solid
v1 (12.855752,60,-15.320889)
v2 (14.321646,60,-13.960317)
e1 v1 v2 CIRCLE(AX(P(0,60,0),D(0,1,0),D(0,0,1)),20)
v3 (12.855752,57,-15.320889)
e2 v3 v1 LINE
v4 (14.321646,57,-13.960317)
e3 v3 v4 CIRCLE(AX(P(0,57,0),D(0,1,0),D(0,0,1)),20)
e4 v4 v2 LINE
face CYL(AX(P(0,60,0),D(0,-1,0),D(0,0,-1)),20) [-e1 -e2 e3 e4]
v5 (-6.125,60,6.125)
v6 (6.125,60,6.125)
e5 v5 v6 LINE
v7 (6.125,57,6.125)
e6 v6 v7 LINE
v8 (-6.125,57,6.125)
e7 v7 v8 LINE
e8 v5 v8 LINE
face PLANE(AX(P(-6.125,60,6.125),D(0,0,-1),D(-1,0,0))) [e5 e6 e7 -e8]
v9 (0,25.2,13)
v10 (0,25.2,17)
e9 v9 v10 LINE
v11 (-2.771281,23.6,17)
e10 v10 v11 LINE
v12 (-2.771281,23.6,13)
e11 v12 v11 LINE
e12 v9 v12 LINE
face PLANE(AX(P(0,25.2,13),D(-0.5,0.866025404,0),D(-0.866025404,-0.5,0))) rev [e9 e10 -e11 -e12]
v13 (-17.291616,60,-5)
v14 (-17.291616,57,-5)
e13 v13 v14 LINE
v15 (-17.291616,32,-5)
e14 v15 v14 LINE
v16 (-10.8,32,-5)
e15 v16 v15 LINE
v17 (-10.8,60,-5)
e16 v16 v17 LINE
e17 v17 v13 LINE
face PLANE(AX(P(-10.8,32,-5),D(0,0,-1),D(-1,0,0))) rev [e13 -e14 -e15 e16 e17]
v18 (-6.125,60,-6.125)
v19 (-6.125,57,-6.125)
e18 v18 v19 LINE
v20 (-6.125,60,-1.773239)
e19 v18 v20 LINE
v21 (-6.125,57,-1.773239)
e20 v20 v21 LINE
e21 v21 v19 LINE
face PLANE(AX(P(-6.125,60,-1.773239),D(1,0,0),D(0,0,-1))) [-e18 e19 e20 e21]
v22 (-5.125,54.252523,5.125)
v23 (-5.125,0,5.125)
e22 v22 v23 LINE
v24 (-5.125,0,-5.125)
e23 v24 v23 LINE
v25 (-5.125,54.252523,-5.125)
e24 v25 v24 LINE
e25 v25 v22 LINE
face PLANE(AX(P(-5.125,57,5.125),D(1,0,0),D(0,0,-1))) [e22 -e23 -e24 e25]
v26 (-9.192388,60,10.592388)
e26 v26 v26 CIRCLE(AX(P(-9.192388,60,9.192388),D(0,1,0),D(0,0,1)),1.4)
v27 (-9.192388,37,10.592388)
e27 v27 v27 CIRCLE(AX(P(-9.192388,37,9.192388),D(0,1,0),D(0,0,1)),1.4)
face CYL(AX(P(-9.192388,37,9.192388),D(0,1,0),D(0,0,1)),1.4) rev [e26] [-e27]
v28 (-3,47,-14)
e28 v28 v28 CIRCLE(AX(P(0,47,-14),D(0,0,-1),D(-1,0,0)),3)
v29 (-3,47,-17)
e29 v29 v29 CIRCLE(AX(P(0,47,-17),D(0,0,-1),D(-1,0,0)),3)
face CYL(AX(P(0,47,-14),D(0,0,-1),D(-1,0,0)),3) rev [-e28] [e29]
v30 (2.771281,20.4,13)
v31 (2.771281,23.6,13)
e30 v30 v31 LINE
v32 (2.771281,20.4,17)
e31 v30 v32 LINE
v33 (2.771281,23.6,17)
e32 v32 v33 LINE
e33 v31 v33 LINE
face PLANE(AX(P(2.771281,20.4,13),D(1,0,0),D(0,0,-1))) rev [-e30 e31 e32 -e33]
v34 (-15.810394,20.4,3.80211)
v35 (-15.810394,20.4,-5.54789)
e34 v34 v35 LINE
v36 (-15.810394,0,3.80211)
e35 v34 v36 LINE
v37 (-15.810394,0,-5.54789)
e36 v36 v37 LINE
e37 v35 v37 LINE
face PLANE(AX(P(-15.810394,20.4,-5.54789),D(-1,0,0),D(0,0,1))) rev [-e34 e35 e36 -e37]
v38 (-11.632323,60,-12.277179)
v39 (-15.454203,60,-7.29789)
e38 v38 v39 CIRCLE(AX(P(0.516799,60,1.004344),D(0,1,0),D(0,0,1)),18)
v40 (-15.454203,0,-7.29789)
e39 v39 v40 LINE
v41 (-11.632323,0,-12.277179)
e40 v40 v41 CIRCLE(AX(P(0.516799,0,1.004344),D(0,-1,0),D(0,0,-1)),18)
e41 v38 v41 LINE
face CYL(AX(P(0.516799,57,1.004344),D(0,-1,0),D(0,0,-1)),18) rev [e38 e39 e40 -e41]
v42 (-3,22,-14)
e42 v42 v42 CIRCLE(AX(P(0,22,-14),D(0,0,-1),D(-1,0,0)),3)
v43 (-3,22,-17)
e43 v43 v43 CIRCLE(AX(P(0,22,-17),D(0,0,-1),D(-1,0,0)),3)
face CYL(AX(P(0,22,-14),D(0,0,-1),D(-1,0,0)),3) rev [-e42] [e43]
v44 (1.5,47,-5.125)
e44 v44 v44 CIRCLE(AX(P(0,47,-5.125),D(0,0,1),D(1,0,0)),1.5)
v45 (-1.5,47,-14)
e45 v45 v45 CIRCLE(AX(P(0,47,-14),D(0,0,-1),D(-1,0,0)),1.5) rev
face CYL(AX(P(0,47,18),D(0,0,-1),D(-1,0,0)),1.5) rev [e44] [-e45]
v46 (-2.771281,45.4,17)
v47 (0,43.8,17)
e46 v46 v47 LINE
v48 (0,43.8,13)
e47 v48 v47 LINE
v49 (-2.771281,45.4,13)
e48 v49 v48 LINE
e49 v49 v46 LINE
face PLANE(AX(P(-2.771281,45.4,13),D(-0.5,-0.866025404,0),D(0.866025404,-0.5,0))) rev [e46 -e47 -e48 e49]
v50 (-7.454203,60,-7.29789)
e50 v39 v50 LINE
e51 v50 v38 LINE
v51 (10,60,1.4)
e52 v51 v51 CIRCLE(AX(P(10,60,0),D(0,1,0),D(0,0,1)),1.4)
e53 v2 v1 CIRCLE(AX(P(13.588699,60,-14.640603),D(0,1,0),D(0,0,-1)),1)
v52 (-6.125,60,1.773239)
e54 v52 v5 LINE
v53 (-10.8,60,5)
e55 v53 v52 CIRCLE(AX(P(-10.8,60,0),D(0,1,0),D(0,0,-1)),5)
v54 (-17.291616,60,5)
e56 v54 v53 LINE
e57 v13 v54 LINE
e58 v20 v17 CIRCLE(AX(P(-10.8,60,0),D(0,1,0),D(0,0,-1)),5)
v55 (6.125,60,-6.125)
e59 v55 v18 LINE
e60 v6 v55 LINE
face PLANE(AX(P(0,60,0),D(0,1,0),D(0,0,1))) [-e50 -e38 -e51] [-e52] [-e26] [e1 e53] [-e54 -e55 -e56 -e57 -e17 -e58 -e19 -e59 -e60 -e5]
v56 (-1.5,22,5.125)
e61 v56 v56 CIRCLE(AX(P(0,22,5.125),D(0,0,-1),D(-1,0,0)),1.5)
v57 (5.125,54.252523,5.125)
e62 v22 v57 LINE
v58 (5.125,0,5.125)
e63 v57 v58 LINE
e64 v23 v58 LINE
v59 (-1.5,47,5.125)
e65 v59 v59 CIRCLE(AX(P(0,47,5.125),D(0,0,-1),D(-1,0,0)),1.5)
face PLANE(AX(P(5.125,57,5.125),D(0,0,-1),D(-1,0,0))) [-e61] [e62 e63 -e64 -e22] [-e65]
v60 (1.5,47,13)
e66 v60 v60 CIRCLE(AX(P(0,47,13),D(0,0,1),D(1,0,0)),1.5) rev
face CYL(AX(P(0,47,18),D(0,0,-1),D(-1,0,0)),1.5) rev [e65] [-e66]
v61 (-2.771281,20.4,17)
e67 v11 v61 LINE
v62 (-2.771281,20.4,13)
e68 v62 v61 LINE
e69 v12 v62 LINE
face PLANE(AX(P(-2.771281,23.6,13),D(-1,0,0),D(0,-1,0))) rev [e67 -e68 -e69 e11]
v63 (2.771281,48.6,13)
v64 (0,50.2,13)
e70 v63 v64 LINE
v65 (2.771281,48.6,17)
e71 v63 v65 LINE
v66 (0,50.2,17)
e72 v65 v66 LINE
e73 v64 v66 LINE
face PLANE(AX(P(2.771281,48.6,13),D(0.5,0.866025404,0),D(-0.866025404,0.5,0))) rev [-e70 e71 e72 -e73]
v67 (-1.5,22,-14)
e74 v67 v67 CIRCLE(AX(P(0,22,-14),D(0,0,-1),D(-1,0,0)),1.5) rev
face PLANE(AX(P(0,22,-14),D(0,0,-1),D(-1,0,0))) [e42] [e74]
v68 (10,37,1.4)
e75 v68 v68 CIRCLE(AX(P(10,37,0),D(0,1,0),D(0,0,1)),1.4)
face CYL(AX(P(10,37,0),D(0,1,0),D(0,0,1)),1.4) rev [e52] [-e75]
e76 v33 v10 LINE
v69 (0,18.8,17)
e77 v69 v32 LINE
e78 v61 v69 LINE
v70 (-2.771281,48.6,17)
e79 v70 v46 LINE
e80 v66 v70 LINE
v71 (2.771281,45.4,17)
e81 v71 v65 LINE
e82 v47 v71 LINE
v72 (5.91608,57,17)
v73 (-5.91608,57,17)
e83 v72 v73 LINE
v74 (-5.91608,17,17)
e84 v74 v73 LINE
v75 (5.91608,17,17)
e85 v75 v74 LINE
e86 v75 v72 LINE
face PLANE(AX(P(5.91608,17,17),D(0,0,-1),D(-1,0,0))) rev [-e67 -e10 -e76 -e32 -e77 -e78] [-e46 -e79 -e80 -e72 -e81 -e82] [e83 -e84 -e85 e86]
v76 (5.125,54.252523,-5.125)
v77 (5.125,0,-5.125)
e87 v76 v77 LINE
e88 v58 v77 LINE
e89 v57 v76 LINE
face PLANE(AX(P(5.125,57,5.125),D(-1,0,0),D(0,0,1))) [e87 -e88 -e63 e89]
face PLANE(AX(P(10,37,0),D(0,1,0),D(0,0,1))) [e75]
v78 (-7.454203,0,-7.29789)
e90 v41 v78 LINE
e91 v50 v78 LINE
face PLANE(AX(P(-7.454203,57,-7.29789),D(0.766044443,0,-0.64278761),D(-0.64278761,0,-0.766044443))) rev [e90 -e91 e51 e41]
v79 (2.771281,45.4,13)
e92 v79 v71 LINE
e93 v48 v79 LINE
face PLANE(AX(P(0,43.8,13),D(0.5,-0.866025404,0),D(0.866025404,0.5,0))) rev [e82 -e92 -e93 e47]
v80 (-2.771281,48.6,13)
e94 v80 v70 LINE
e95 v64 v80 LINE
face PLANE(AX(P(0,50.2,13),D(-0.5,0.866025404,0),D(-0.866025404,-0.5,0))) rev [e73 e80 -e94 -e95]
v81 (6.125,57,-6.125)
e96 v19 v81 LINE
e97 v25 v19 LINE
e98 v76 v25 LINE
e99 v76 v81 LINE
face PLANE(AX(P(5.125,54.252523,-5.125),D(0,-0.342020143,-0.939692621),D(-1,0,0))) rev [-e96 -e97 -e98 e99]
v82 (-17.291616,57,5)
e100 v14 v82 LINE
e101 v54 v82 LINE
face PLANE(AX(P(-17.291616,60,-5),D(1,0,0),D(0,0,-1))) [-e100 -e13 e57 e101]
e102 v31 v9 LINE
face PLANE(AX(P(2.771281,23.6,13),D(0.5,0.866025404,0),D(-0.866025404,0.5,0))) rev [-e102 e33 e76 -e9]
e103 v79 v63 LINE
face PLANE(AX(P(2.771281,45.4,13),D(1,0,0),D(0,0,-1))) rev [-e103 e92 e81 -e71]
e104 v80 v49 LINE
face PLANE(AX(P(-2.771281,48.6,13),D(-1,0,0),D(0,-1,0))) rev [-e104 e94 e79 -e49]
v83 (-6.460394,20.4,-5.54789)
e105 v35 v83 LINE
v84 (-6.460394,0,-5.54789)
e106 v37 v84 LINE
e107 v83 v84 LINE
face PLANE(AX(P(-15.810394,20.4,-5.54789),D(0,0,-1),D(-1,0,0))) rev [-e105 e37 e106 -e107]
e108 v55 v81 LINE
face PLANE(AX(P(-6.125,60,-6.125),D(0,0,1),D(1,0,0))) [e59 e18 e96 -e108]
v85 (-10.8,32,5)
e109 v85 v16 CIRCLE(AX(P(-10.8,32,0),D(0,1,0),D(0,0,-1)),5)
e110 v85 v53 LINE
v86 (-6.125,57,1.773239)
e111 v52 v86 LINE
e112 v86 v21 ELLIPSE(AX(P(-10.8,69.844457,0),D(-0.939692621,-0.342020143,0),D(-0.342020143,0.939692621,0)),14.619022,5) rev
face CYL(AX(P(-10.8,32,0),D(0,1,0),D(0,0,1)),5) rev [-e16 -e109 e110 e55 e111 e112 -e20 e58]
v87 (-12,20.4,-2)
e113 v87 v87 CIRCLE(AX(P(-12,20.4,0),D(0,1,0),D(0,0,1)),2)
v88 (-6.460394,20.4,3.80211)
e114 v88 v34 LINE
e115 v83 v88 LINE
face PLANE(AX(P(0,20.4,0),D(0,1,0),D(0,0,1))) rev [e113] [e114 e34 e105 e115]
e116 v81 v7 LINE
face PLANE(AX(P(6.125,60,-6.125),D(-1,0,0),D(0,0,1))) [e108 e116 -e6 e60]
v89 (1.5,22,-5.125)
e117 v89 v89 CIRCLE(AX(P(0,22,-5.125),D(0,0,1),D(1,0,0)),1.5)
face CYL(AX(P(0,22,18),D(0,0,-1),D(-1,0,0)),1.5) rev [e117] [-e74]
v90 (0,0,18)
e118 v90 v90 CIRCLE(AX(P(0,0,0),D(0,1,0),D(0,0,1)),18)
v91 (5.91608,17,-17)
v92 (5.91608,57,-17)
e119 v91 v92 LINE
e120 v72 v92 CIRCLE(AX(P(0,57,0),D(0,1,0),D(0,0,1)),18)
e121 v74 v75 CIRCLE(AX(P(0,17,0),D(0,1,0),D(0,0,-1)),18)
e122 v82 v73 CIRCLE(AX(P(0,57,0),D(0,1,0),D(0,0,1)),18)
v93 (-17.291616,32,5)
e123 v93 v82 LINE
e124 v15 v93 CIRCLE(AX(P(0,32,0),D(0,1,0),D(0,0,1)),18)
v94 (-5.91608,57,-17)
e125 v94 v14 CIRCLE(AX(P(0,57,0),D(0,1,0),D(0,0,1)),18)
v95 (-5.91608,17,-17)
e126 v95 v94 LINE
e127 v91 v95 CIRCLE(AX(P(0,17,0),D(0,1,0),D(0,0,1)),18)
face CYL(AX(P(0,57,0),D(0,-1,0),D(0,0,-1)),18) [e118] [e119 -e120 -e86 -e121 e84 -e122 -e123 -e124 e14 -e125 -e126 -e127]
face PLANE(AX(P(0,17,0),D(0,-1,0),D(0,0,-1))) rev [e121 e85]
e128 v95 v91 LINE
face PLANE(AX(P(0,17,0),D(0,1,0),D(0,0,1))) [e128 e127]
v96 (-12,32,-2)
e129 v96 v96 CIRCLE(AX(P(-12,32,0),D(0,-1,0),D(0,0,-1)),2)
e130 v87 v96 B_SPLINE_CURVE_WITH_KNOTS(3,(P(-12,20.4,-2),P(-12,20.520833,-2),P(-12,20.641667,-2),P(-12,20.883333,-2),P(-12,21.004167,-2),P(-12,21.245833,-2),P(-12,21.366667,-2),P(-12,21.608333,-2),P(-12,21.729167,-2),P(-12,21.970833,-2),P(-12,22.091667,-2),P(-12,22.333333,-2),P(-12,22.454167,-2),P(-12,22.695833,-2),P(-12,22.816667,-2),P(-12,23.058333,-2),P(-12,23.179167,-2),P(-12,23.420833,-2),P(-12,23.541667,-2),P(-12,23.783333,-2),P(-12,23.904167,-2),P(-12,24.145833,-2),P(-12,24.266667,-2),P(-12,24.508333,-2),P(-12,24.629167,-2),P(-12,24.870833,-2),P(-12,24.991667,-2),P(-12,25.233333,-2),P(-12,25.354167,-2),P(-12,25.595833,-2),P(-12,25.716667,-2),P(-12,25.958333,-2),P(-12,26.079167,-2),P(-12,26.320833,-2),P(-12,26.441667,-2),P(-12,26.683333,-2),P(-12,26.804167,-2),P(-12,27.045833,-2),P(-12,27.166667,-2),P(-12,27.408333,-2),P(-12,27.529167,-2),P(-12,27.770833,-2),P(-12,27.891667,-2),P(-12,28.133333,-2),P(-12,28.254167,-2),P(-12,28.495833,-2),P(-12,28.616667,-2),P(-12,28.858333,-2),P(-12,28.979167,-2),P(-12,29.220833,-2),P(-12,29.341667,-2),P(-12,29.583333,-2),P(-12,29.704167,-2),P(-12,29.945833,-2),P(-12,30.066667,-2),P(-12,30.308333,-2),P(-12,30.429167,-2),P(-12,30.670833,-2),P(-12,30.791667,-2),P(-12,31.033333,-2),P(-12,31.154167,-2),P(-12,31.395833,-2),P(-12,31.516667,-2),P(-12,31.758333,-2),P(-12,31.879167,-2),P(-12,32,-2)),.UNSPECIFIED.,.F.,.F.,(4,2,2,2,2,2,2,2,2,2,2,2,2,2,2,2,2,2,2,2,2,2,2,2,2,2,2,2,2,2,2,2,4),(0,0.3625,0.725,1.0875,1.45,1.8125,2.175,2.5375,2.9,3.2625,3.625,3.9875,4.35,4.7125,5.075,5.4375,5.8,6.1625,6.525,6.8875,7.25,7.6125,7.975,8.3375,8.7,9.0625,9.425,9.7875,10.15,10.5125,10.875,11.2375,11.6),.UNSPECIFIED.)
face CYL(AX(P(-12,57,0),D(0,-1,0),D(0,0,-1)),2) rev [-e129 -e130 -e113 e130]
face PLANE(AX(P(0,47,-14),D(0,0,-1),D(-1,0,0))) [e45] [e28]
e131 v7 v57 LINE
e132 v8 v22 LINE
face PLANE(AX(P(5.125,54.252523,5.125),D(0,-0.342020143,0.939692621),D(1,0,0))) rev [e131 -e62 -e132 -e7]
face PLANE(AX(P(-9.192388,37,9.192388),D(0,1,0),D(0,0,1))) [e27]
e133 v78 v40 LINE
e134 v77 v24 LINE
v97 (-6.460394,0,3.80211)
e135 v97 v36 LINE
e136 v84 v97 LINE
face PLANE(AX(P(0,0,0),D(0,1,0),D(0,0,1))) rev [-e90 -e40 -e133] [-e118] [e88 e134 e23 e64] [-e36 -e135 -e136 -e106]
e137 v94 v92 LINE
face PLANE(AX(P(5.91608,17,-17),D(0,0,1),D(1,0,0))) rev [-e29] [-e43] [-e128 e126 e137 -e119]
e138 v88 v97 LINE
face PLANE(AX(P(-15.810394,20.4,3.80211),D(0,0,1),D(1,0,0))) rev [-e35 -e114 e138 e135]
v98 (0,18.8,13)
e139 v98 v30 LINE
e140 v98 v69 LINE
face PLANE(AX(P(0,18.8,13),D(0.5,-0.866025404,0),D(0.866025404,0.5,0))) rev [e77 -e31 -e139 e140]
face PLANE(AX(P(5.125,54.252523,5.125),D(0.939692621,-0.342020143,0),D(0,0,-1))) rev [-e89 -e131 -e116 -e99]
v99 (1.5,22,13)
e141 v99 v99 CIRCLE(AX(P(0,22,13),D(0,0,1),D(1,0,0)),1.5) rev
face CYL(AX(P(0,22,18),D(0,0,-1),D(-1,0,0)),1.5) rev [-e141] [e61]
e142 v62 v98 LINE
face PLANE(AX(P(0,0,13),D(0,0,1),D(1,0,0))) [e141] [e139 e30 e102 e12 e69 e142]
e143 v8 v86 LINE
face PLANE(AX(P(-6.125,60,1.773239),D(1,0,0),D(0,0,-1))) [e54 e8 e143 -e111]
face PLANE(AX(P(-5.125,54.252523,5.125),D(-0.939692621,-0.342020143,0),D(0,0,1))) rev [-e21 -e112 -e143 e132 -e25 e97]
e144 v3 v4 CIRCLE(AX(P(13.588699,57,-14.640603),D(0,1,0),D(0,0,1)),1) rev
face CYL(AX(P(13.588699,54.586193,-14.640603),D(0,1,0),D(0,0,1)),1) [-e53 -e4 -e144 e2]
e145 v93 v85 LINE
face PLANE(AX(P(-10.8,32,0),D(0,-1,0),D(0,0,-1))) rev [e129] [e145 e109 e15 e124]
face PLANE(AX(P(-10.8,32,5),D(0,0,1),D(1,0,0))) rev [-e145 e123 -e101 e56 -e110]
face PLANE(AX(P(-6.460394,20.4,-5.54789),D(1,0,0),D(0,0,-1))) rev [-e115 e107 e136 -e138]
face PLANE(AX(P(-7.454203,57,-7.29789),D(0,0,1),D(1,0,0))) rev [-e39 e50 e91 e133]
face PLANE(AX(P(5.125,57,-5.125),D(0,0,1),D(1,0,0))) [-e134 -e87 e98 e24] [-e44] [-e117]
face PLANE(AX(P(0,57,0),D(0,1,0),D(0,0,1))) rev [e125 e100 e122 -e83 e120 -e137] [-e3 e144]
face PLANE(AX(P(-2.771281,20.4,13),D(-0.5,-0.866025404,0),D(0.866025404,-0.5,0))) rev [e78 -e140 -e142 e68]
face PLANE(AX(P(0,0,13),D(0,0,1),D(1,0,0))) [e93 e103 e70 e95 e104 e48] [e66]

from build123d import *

# Parameters (mm, degrees)
SKETCH1_R           = 18
SKETCH1_R_2         = 2
SKETCH1_W           = 10.25
SKETCH1_H           = 10.25
BOSS_EXTRUDE1_DEPTH = 57
CUT_EXTRUDE1_START  = -25
CUT_EXTRUDE1_DEPTH  = 25
SKETCH4_W           = 9.35
SKETCH4_H           = 9.35
CUT_EXTRUDE3_DEPTH  = 20.4
CUT_EXTRUDE4_START  = -40
CUT_EXTRUDE4_DEPTH  = 40
SKETCH6_R           = 1.5
CUT_EXTRUDE5_DEPTH  = 70.267597042
SKETCH7_R           = 3
CUT_EXTRUDE6_DEPTH  = 3
CUT_EXTRUDE7_DEPTH  = 4
CHAMFER1_SIZE       = 1
CHAMFER1_SIZE_2     = 2.747477419
CUT_EXTRUDE8_DEPTH  = 63.42595614
SKETCH12_R          = 1.4
CUT_EXTRUDE10_DEPTH = 20
SKETCH13_R          = 20
SKETCH13_R_2        = 1.4
BOSS_EXTRUDE2_DEPTH = 3
BOSS_EXTRUDE3_DEPTH = 3


with BuildPart() as part:
    # Sketch1 → Boss-Extrude1 (new body)
    with BuildSketch(Plane(origin=(0, 0, 0), x_dir=(1, 0, 0), z_dir=(0, 1, 0))):
        with Locations(Location((0, 0, 0), (0, 0, 90))):
            Circle(SKETCH1_R)
        with Locations(Location((-12, 0, 0), (0, 0, 90))):
            Circle(SKETCH1_R_2, mode=Mode.SUBTRACT)
        Rectangle(SKETCH1_W, SKETCH1_H, mode=Mode.SUBTRACT)
    extrude(amount=BOSS_EXTRUDE1_DEPTH)

    # Sketch2 → Cut-Extrude1 (cut)
    with BuildSketch(Plane(origin=(0, 57, 0), x_dir=(1, 0, 0), z_dir=(0, 1, 0)).offset(CUT_EXTRUDE1_START)):
        with BuildLine():
            Line((-10.8, 5), (-17.291616466, 5))
            ThreePointArc((-17.291616466, 5), (-18, 0), (-17.291616466, -5))
            Line((-17.291616466, -5), (-10.8, -5))
            ThreePointArc((-10.8, -5), (-5.8, 0), (-10.8, 5))
        make_face()
    extrude(amount=CUT_EXTRUDE1_DEPTH, mode=Mode.SUBTRACT)

    # Sketch4 → Cut-Extrude3 (cut)
    with BuildSketch(Plane(origin=(0, 0, 0), x_dir=(-1, 0, 0), z_dir=(0, -1, 0))):
        with Locations((11.135393506, 0.872889968)):
            Rectangle(SKETCH4_W, SKETCH4_H)
    extrude(amount=-CUT_EXTRUDE3_DEPTH, mode=Mode.SUBTRACT)

    # Sketch5 → Cut-Extrude4 (cut)
    with BuildSketch(Plane(origin=(0, 57, 0), x_dir=(1, 0, 0), z_dir=(0, 1, 0)).offset(CUT_EXTRUDE4_START)):
        with BuildLine():
            Line((5.916079783, 17), (-5.916079783, 17))
            ThreePointArc((-5.916079783, 17), (0, 18), (5.916079783, 17))
        make_face()
        with BuildLine():
            Line((5.916079783, -17), (-5.916079783, -17))
            ThreePointArc((-5.916079783, -17), (0, -18), (5.916079783, -17))
        make_face()
    extrude(amount=CUT_EXTRUDE4_DEPTH, mode=Mode.SUBTRACT)

    # Sketch6 → Cut-Extrude5 (cut, through all)
    with BuildSketch(Plane(origin=(0, 0, -17), x_dir=(-1, 0, 0), z_dir=(0, 0, -1))):
        with Locations((0, 47)):
            Circle(SKETCH6_R)
        with Locations((0, 22)):
            Circle(SKETCH6_R)
    extrude(amount=-CUT_EXTRUDE5_DEPTH, mode=Mode.SUBTRACT)

    # Sketch7 → Cut-Extrude6 (cut)
    with BuildSketch(Plane(origin=(0, 0, -17), x_dir=(-1, 0, 0), z_dir=(0, 0, -1))):
        with Locations((0, 47)):
            Circle(SKETCH7_R)
        with Locations((0, 22)):
            Circle(SKETCH7_R)
    extrude(amount=-CUT_EXTRUDE6_DEPTH, mode=Mode.SUBTRACT)

    # Sketch8 → Cut-Extrude7 (cut)
    with BuildSketch(Plane.XY.offset(17)):
        Polygon((0, 43.8), (2.771281292, 45.4), (2.771281292, 48.6), (0, 50.2), (-2.771281292, 48.6), (-2.771281292, 45.4), align=None)
        Polygon((0, 18.8), (2.771281292, 20.4), (2.771281292, 23.6), (0, 25.2), (-2.771281292, 23.6), (-2.771281292, 20.4), align=None)
    extrude(amount=-CUT_EXTRUDE7_DEPTH, mode=Mode.SUBTRACT)

    # Chamfer1
    # the kernel refuses this chamfer: 2.747477419, 1 mm, written as the material it takes off along each edge
    with BuildSketch(Plane(origin=(-5.125, 57, -5.125), x_dir=(0, 0.09904090225204956, -0.9950833631817488), z_dir=(1, 0, 0)), Plane(origin=(-5.125, 57, 5.125), x_dir=(-0.9950833631817488, 0.09904090225204956, 0), z_dir=(0, 0, -1)), Plane(origin=(5.125, 57, 5.125), x_dir=(0, 0.09904090225204956, 0.9950833631817488), z_dir=(-1, 0, 0)), Plane(origin=(5.125, 57, -5.125), x_dir=(0.9950833631817488, 0.09904090225204956, 0), z_dir=(0, 0, 1))) as chamfer1_piece_1:
        Polygon((CHAMFER1_SIZE * 0.995083363182, -CHAMFER1_SIZE * 0.099040902252), (-CHAMFER1_SIZE_2 * 0.0990409022684, -CHAMFER1_SIZE_2 * 0.995083363346), (0, 0), align=None)
    extrude(amount=10.25, mode=Mode.SUBTRACT)
    with BuildSketch(Plane(origin=(-5.125, 57, 5.125), x_dir=(-0.9950833631817488, 0.09904090225204956, 0), z_dir=(0, 0, -1))) as chamfer1_piece_2a_section:
        Polygon((CHAMFER1_SIZE * 0.995083363182, -CHAMFER1_SIZE * 0.099040902252), (-CHAMFER1_SIZE_2 * 0.0990409022684, -CHAMFER1_SIZE_2 * 0.995083363346), (0, 0), align=None)
    chamfer1_piece_2a = extrude(amount=17.377491449, mode=Mode.PRIVATE)
    chamfer1_piece_2a = split(chamfer1_piece_2a, bisect_by=Plane(origin=(-5.432505006, 56.059901151, -5.125), z_dir=(0, 0, -1)), keep=Keep.TOP, mode=Mode.PRIVATE)
    with BuildSketch(Plane(origin=(-12.252491449, 57, -5.125), x_dir=(0, 0.09904090225204956, -0.9950833631817488), z_dir=(1, 0, 0))) as chamfer1_piece_2b_section:
        Polygon((CHAMFER1_SIZE * 0.995083363182, -CHAMFER1_SIZE * 0.099040902252), (-CHAMFER1_SIZE_2 * 0.0990409022684, -CHAMFER1_SIZE_2 * 0.995083363346), (0, 0), align=None)
    chamfer1_piece_2b = extrude(amount=17.377491449, mode=Mode.PRIVATE)
    chamfer1_piece_2b = split(chamfer1_piece_2b, bisect_by=Plane(origin=(-5.125, 56.059901151, -5.432505006), z_dir=(-1, 0, 0)), keep=Keep.TOP, mode=Mode.PRIVATE)
    chamfer1_piece_2 = chamfer1_piece_2a & chamfer1_piece_2b
    add(chamfer1_piece_2, mode=Mode.SUBTRACT)
    with BuildSketch(Plane(origin=(5.125, 57, -12.252491449), x_dir=(0.9950833631817488, 0.09904090225204956, 0), z_dir=(0, 0, 1))) as chamfer1_piece_3a_section:
        Polygon((CHAMFER1_SIZE * 0.995083363182, -CHAMFER1_SIZE * 0.099040902252), (-CHAMFER1_SIZE_2 * 0.0990409022684, -CHAMFER1_SIZE_2 * 0.995083363346), (0, 0), align=None)
    chamfer1_piece_3a = extrude(amount=17.377491449, mode=Mode.PRIVATE)
    chamfer1_piece_3a = split(chamfer1_piece_3a, bisect_by=Plane(origin=(5.432505006, 56.059901151, -5.125), z_dir=(0, 0, -1)), keep=Keep.TOP, mode=Mode.PRIVATE)
    with BuildSketch(Plane(origin=(-5.125, 57, -5.125), x_dir=(0, 0.09904090225204956, -0.9950833631817488), z_dir=(1, 0, 0))) as chamfer1_piece_3b_section:
        Polygon((CHAMFER1_SIZE * 0.995083363182, -CHAMFER1_SIZE * 0.099040902252), (-CHAMFER1_SIZE_2 * 0.0990409022684, -CHAMFER1_SIZE_2 * 0.995083363346), (0, 0), align=None)
    chamfer1_piece_3b = extrude(amount=17.377491449, mode=Mode.PRIVATE)
    chamfer1_piece_3b = split(chamfer1_piece_3b, bisect_by=Plane(origin=(5.125, 56.059901151, -5.432505006), z_dir=(1, 0, 0)), keep=Keep.TOP, mode=Mode.PRIVATE)
    chamfer1_piece_3 = chamfer1_piece_3a & chamfer1_piece_3b
    add(chamfer1_piece_3, mode=Mode.SUBTRACT)
    with BuildSketch(Plane(origin=(5.125, 57, 5.125), x_dir=(0, 0.09904090225204956, 0.9950833631817488), z_dir=(-1, 0, 0))) as chamfer1_piece_4a_section:
        Polygon((CHAMFER1_SIZE * 0.995083363182, -CHAMFER1_SIZE * 0.099040902252), (-CHAMFER1_SIZE_2 * 0.0990409022684, -CHAMFER1_SIZE_2 * 0.995083363346), (0, 0), align=None)
    chamfer1_piece_4a = extrude(amount=17.377491449, mode=Mode.PRIVATE)
    chamfer1_piece_4a = split(chamfer1_piece_4a, bisect_by=Plane(origin=(-5.125, 56.059901151, 5.432505006), z_dir=(-1, 0, 0)), keep=Keep.TOP, mode=Mode.PRIVATE)
    with BuildSketch(Plane(origin=(-5.125, 57, 12.252491449), x_dir=(-0.9950833631817488, 0.09904090225204956, 0), z_dir=(0, 0, -1))) as chamfer1_piece_4b_section:
        Polygon((CHAMFER1_SIZE * 0.995083363182, -CHAMFER1_SIZE * 0.099040902252), (-CHAMFER1_SIZE_2 * 0.0990409022684, -CHAMFER1_SIZE_2 * 0.995083363346), (0, 0), align=None)
    chamfer1_piece_4b = extrude(amount=17.377491449, mode=Mode.PRIVATE)
    chamfer1_piece_4b = split(chamfer1_piece_4b, bisect_by=Plane(origin=(-5.432505006, 56.059901151, 5.125), z_dir=(0, 0, 1)), keep=Keep.TOP, mode=Mode.PRIVATE)
    chamfer1_piece_4 = chamfer1_piece_4a & chamfer1_piece_4b
    add(chamfer1_piece_4, mode=Mode.SUBTRACT)
    with BuildSketch(Plane(origin=(12.252491449, 57, 5.125), x_dir=(0, 0.09904090225204956, 0.9950833631817488), z_dir=(-1, 0, 0))) as chamfer1_piece_5a_section:
        Polygon((CHAMFER1_SIZE * 0.995083363182, -CHAMFER1_SIZE * 0.099040902252), (-CHAMFER1_SIZE_2 * 0.0990409022684, -CHAMFER1_SIZE_2 * 0.995083363346), (0, 0), align=None)
    chamfer1_piece_5a = extrude(amount=17.377491449, mode=Mode.PRIVATE)
    chamfer1_piece_5a = split(chamfer1_piece_5a, bisect_by=Plane(origin=(5.125, 56.059901151, 5.432505006), z_dir=(1, 0, 0)), keep=Keep.TOP, mode=Mode.PRIVATE)
    with BuildSketch(Plane(origin=(5.125, 57, -5.125), x_dir=(0.9950833631817488, 0.09904090225204956, 0), z_dir=(0, 0, 1))) as chamfer1_piece_5b_section:
        Polygon((CHAMFER1_SIZE * 0.995083363182, -CHAMFER1_SIZE * 0.099040902252), (-CHAMFER1_SIZE_2 * 0.0990409022684, -CHAMFER1_SIZE_2 * 0.995083363346), (0, 0), align=None)
    chamfer1_piece_5b = extrude(amount=17.377491449, mode=Mode.PRIVATE)
    chamfer1_piece_5b = split(chamfer1_piece_5b, bisect_by=Plane(origin=(5.432505006, 56.059901151, 5.125), z_dir=(0, 0, 1)), keep=Keep.TOP, mode=Mode.PRIVATE)
    chamfer1_piece_5 = chamfer1_piece_5a & chamfer1_piece_5b
    add(chamfer1_piece_5, mode=Mode.SUBTRACT)

    # Sketch9 → Cut-Extrude8 (cut, through all)
    with BuildSketch(Plane.XZ):
        with BuildLine():
            Line((-7.454203172, -7.297889968), (-15.454203172, -7.297889968))
            ThreePointArc((-15.454203172, -7.297889968), (-13.761984914, -9.955415688), (-11.632322635, -12.277178848))
            Line((-11.632322635, -12.277178848), (-7.454203172, -7.297889968))
        make_face()
    extrude(amount=-CUT_EXTRUDE8_DEPTH, mode=Mode.SUBTRACT)

    # Sketch12 → Cut-Extrude10 (cut)
    with BuildSketch(Plane(origin=(0, 57, 0), x_dir=(1, 0, 0), z_dir=(0, 1, 0))):
        with Locations(Location((10, 0, 0), (0, 0, 270))):
            Circle(SKETCH12_R)
        with Locations(Location((-9.192388155, -9.192388155, 0), (0, 0, 270))):
            Circle(SKETCH12_R)
    extrude(amount=-CUT_EXTRUDE10_DEPTH, mode=Mode.SUBTRACT)

    # Sketch13 → Boss-Extrude2 (add)
    with BuildSketch(Plane(origin=(0, 57, 0), x_dir=(1, 0, 0), z_dir=(0, 1, 0))):
        with Locations(Location((0, 0, 0), (0, 0, 270))):
            Circle(SKETCH13_R)
        with Locations(Location((10, 0, 0), (0, 0, 270))):
            Circle(SKETCH13_R_2, mode=Mode.SUBTRACT)
        with Locations(Location((-9.192388155, -9.192388155, 0), (0, 0, 270))):
            Circle(SKETCH13_R_2, mode=Mode.SUBTRACT)
        with BuildLine():
            Line((-10.8, 5), (-17.291616466, 5))
            Line((-17.291616466, 5), (-17.291616466, -5))
            Line((-17.291616466, -5), (-10.8, -5))
            ThreePointArc((-10.8, -5), (-7.959770503, -4.114984375), (-6.125, -1.773238563))
            Line((-6.125, -1.773238563), (-6.125, -6.125))
            Line((-6.125, -6.125), (6.125, -6.125))
            Line((6.125, -6.125), (6.125, 6.125))
            Line((6.125, 6.125), (-6.125, 6.125))
            Line((-6.125, 6.125), (-6.125, 1.773238563))
            ThreePointArc((-6.125, 1.773238563), (-7.959770503, 4.114984375), (-10.8, 5))
        make_face(mode=Mode.SUBTRACT)
        with BuildLine():
            Line((-7.454203172, 7.297889968), (-15.454203172, 7.297889968))
            ThreePointArc((-15.454203172, 7.297889968), (-13.761984914, 9.955415688), (-11.632322635, 12.277178848))
            Line((-11.632322635, 12.277178848), (-7.454203172, 7.297889968))
        make_face(mode=Mode.SUBTRACT)
    extrude(amount=BOSS_EXTRUDE2_DEPTH)

    # Sketch14 → Boss-Extrude3 (add)
    with BuildSketch(Plane(origin=(0, 60, 0), x_dir=(1, 0, 0), z_dir=(0, 1, 0))):
        with BuildLine():
            Line((12.855752194, 15.320888862), (14.321646009, 13.960317173))
            ThreePointArc((14.321646009, 13.960317173), (14.268984946, 15.373549926), (12.855752194, 15.320888862))
        make_face()
    extrude(amount=-BOSS_EXTRUDE3_DEPTH)


solid = part.part
